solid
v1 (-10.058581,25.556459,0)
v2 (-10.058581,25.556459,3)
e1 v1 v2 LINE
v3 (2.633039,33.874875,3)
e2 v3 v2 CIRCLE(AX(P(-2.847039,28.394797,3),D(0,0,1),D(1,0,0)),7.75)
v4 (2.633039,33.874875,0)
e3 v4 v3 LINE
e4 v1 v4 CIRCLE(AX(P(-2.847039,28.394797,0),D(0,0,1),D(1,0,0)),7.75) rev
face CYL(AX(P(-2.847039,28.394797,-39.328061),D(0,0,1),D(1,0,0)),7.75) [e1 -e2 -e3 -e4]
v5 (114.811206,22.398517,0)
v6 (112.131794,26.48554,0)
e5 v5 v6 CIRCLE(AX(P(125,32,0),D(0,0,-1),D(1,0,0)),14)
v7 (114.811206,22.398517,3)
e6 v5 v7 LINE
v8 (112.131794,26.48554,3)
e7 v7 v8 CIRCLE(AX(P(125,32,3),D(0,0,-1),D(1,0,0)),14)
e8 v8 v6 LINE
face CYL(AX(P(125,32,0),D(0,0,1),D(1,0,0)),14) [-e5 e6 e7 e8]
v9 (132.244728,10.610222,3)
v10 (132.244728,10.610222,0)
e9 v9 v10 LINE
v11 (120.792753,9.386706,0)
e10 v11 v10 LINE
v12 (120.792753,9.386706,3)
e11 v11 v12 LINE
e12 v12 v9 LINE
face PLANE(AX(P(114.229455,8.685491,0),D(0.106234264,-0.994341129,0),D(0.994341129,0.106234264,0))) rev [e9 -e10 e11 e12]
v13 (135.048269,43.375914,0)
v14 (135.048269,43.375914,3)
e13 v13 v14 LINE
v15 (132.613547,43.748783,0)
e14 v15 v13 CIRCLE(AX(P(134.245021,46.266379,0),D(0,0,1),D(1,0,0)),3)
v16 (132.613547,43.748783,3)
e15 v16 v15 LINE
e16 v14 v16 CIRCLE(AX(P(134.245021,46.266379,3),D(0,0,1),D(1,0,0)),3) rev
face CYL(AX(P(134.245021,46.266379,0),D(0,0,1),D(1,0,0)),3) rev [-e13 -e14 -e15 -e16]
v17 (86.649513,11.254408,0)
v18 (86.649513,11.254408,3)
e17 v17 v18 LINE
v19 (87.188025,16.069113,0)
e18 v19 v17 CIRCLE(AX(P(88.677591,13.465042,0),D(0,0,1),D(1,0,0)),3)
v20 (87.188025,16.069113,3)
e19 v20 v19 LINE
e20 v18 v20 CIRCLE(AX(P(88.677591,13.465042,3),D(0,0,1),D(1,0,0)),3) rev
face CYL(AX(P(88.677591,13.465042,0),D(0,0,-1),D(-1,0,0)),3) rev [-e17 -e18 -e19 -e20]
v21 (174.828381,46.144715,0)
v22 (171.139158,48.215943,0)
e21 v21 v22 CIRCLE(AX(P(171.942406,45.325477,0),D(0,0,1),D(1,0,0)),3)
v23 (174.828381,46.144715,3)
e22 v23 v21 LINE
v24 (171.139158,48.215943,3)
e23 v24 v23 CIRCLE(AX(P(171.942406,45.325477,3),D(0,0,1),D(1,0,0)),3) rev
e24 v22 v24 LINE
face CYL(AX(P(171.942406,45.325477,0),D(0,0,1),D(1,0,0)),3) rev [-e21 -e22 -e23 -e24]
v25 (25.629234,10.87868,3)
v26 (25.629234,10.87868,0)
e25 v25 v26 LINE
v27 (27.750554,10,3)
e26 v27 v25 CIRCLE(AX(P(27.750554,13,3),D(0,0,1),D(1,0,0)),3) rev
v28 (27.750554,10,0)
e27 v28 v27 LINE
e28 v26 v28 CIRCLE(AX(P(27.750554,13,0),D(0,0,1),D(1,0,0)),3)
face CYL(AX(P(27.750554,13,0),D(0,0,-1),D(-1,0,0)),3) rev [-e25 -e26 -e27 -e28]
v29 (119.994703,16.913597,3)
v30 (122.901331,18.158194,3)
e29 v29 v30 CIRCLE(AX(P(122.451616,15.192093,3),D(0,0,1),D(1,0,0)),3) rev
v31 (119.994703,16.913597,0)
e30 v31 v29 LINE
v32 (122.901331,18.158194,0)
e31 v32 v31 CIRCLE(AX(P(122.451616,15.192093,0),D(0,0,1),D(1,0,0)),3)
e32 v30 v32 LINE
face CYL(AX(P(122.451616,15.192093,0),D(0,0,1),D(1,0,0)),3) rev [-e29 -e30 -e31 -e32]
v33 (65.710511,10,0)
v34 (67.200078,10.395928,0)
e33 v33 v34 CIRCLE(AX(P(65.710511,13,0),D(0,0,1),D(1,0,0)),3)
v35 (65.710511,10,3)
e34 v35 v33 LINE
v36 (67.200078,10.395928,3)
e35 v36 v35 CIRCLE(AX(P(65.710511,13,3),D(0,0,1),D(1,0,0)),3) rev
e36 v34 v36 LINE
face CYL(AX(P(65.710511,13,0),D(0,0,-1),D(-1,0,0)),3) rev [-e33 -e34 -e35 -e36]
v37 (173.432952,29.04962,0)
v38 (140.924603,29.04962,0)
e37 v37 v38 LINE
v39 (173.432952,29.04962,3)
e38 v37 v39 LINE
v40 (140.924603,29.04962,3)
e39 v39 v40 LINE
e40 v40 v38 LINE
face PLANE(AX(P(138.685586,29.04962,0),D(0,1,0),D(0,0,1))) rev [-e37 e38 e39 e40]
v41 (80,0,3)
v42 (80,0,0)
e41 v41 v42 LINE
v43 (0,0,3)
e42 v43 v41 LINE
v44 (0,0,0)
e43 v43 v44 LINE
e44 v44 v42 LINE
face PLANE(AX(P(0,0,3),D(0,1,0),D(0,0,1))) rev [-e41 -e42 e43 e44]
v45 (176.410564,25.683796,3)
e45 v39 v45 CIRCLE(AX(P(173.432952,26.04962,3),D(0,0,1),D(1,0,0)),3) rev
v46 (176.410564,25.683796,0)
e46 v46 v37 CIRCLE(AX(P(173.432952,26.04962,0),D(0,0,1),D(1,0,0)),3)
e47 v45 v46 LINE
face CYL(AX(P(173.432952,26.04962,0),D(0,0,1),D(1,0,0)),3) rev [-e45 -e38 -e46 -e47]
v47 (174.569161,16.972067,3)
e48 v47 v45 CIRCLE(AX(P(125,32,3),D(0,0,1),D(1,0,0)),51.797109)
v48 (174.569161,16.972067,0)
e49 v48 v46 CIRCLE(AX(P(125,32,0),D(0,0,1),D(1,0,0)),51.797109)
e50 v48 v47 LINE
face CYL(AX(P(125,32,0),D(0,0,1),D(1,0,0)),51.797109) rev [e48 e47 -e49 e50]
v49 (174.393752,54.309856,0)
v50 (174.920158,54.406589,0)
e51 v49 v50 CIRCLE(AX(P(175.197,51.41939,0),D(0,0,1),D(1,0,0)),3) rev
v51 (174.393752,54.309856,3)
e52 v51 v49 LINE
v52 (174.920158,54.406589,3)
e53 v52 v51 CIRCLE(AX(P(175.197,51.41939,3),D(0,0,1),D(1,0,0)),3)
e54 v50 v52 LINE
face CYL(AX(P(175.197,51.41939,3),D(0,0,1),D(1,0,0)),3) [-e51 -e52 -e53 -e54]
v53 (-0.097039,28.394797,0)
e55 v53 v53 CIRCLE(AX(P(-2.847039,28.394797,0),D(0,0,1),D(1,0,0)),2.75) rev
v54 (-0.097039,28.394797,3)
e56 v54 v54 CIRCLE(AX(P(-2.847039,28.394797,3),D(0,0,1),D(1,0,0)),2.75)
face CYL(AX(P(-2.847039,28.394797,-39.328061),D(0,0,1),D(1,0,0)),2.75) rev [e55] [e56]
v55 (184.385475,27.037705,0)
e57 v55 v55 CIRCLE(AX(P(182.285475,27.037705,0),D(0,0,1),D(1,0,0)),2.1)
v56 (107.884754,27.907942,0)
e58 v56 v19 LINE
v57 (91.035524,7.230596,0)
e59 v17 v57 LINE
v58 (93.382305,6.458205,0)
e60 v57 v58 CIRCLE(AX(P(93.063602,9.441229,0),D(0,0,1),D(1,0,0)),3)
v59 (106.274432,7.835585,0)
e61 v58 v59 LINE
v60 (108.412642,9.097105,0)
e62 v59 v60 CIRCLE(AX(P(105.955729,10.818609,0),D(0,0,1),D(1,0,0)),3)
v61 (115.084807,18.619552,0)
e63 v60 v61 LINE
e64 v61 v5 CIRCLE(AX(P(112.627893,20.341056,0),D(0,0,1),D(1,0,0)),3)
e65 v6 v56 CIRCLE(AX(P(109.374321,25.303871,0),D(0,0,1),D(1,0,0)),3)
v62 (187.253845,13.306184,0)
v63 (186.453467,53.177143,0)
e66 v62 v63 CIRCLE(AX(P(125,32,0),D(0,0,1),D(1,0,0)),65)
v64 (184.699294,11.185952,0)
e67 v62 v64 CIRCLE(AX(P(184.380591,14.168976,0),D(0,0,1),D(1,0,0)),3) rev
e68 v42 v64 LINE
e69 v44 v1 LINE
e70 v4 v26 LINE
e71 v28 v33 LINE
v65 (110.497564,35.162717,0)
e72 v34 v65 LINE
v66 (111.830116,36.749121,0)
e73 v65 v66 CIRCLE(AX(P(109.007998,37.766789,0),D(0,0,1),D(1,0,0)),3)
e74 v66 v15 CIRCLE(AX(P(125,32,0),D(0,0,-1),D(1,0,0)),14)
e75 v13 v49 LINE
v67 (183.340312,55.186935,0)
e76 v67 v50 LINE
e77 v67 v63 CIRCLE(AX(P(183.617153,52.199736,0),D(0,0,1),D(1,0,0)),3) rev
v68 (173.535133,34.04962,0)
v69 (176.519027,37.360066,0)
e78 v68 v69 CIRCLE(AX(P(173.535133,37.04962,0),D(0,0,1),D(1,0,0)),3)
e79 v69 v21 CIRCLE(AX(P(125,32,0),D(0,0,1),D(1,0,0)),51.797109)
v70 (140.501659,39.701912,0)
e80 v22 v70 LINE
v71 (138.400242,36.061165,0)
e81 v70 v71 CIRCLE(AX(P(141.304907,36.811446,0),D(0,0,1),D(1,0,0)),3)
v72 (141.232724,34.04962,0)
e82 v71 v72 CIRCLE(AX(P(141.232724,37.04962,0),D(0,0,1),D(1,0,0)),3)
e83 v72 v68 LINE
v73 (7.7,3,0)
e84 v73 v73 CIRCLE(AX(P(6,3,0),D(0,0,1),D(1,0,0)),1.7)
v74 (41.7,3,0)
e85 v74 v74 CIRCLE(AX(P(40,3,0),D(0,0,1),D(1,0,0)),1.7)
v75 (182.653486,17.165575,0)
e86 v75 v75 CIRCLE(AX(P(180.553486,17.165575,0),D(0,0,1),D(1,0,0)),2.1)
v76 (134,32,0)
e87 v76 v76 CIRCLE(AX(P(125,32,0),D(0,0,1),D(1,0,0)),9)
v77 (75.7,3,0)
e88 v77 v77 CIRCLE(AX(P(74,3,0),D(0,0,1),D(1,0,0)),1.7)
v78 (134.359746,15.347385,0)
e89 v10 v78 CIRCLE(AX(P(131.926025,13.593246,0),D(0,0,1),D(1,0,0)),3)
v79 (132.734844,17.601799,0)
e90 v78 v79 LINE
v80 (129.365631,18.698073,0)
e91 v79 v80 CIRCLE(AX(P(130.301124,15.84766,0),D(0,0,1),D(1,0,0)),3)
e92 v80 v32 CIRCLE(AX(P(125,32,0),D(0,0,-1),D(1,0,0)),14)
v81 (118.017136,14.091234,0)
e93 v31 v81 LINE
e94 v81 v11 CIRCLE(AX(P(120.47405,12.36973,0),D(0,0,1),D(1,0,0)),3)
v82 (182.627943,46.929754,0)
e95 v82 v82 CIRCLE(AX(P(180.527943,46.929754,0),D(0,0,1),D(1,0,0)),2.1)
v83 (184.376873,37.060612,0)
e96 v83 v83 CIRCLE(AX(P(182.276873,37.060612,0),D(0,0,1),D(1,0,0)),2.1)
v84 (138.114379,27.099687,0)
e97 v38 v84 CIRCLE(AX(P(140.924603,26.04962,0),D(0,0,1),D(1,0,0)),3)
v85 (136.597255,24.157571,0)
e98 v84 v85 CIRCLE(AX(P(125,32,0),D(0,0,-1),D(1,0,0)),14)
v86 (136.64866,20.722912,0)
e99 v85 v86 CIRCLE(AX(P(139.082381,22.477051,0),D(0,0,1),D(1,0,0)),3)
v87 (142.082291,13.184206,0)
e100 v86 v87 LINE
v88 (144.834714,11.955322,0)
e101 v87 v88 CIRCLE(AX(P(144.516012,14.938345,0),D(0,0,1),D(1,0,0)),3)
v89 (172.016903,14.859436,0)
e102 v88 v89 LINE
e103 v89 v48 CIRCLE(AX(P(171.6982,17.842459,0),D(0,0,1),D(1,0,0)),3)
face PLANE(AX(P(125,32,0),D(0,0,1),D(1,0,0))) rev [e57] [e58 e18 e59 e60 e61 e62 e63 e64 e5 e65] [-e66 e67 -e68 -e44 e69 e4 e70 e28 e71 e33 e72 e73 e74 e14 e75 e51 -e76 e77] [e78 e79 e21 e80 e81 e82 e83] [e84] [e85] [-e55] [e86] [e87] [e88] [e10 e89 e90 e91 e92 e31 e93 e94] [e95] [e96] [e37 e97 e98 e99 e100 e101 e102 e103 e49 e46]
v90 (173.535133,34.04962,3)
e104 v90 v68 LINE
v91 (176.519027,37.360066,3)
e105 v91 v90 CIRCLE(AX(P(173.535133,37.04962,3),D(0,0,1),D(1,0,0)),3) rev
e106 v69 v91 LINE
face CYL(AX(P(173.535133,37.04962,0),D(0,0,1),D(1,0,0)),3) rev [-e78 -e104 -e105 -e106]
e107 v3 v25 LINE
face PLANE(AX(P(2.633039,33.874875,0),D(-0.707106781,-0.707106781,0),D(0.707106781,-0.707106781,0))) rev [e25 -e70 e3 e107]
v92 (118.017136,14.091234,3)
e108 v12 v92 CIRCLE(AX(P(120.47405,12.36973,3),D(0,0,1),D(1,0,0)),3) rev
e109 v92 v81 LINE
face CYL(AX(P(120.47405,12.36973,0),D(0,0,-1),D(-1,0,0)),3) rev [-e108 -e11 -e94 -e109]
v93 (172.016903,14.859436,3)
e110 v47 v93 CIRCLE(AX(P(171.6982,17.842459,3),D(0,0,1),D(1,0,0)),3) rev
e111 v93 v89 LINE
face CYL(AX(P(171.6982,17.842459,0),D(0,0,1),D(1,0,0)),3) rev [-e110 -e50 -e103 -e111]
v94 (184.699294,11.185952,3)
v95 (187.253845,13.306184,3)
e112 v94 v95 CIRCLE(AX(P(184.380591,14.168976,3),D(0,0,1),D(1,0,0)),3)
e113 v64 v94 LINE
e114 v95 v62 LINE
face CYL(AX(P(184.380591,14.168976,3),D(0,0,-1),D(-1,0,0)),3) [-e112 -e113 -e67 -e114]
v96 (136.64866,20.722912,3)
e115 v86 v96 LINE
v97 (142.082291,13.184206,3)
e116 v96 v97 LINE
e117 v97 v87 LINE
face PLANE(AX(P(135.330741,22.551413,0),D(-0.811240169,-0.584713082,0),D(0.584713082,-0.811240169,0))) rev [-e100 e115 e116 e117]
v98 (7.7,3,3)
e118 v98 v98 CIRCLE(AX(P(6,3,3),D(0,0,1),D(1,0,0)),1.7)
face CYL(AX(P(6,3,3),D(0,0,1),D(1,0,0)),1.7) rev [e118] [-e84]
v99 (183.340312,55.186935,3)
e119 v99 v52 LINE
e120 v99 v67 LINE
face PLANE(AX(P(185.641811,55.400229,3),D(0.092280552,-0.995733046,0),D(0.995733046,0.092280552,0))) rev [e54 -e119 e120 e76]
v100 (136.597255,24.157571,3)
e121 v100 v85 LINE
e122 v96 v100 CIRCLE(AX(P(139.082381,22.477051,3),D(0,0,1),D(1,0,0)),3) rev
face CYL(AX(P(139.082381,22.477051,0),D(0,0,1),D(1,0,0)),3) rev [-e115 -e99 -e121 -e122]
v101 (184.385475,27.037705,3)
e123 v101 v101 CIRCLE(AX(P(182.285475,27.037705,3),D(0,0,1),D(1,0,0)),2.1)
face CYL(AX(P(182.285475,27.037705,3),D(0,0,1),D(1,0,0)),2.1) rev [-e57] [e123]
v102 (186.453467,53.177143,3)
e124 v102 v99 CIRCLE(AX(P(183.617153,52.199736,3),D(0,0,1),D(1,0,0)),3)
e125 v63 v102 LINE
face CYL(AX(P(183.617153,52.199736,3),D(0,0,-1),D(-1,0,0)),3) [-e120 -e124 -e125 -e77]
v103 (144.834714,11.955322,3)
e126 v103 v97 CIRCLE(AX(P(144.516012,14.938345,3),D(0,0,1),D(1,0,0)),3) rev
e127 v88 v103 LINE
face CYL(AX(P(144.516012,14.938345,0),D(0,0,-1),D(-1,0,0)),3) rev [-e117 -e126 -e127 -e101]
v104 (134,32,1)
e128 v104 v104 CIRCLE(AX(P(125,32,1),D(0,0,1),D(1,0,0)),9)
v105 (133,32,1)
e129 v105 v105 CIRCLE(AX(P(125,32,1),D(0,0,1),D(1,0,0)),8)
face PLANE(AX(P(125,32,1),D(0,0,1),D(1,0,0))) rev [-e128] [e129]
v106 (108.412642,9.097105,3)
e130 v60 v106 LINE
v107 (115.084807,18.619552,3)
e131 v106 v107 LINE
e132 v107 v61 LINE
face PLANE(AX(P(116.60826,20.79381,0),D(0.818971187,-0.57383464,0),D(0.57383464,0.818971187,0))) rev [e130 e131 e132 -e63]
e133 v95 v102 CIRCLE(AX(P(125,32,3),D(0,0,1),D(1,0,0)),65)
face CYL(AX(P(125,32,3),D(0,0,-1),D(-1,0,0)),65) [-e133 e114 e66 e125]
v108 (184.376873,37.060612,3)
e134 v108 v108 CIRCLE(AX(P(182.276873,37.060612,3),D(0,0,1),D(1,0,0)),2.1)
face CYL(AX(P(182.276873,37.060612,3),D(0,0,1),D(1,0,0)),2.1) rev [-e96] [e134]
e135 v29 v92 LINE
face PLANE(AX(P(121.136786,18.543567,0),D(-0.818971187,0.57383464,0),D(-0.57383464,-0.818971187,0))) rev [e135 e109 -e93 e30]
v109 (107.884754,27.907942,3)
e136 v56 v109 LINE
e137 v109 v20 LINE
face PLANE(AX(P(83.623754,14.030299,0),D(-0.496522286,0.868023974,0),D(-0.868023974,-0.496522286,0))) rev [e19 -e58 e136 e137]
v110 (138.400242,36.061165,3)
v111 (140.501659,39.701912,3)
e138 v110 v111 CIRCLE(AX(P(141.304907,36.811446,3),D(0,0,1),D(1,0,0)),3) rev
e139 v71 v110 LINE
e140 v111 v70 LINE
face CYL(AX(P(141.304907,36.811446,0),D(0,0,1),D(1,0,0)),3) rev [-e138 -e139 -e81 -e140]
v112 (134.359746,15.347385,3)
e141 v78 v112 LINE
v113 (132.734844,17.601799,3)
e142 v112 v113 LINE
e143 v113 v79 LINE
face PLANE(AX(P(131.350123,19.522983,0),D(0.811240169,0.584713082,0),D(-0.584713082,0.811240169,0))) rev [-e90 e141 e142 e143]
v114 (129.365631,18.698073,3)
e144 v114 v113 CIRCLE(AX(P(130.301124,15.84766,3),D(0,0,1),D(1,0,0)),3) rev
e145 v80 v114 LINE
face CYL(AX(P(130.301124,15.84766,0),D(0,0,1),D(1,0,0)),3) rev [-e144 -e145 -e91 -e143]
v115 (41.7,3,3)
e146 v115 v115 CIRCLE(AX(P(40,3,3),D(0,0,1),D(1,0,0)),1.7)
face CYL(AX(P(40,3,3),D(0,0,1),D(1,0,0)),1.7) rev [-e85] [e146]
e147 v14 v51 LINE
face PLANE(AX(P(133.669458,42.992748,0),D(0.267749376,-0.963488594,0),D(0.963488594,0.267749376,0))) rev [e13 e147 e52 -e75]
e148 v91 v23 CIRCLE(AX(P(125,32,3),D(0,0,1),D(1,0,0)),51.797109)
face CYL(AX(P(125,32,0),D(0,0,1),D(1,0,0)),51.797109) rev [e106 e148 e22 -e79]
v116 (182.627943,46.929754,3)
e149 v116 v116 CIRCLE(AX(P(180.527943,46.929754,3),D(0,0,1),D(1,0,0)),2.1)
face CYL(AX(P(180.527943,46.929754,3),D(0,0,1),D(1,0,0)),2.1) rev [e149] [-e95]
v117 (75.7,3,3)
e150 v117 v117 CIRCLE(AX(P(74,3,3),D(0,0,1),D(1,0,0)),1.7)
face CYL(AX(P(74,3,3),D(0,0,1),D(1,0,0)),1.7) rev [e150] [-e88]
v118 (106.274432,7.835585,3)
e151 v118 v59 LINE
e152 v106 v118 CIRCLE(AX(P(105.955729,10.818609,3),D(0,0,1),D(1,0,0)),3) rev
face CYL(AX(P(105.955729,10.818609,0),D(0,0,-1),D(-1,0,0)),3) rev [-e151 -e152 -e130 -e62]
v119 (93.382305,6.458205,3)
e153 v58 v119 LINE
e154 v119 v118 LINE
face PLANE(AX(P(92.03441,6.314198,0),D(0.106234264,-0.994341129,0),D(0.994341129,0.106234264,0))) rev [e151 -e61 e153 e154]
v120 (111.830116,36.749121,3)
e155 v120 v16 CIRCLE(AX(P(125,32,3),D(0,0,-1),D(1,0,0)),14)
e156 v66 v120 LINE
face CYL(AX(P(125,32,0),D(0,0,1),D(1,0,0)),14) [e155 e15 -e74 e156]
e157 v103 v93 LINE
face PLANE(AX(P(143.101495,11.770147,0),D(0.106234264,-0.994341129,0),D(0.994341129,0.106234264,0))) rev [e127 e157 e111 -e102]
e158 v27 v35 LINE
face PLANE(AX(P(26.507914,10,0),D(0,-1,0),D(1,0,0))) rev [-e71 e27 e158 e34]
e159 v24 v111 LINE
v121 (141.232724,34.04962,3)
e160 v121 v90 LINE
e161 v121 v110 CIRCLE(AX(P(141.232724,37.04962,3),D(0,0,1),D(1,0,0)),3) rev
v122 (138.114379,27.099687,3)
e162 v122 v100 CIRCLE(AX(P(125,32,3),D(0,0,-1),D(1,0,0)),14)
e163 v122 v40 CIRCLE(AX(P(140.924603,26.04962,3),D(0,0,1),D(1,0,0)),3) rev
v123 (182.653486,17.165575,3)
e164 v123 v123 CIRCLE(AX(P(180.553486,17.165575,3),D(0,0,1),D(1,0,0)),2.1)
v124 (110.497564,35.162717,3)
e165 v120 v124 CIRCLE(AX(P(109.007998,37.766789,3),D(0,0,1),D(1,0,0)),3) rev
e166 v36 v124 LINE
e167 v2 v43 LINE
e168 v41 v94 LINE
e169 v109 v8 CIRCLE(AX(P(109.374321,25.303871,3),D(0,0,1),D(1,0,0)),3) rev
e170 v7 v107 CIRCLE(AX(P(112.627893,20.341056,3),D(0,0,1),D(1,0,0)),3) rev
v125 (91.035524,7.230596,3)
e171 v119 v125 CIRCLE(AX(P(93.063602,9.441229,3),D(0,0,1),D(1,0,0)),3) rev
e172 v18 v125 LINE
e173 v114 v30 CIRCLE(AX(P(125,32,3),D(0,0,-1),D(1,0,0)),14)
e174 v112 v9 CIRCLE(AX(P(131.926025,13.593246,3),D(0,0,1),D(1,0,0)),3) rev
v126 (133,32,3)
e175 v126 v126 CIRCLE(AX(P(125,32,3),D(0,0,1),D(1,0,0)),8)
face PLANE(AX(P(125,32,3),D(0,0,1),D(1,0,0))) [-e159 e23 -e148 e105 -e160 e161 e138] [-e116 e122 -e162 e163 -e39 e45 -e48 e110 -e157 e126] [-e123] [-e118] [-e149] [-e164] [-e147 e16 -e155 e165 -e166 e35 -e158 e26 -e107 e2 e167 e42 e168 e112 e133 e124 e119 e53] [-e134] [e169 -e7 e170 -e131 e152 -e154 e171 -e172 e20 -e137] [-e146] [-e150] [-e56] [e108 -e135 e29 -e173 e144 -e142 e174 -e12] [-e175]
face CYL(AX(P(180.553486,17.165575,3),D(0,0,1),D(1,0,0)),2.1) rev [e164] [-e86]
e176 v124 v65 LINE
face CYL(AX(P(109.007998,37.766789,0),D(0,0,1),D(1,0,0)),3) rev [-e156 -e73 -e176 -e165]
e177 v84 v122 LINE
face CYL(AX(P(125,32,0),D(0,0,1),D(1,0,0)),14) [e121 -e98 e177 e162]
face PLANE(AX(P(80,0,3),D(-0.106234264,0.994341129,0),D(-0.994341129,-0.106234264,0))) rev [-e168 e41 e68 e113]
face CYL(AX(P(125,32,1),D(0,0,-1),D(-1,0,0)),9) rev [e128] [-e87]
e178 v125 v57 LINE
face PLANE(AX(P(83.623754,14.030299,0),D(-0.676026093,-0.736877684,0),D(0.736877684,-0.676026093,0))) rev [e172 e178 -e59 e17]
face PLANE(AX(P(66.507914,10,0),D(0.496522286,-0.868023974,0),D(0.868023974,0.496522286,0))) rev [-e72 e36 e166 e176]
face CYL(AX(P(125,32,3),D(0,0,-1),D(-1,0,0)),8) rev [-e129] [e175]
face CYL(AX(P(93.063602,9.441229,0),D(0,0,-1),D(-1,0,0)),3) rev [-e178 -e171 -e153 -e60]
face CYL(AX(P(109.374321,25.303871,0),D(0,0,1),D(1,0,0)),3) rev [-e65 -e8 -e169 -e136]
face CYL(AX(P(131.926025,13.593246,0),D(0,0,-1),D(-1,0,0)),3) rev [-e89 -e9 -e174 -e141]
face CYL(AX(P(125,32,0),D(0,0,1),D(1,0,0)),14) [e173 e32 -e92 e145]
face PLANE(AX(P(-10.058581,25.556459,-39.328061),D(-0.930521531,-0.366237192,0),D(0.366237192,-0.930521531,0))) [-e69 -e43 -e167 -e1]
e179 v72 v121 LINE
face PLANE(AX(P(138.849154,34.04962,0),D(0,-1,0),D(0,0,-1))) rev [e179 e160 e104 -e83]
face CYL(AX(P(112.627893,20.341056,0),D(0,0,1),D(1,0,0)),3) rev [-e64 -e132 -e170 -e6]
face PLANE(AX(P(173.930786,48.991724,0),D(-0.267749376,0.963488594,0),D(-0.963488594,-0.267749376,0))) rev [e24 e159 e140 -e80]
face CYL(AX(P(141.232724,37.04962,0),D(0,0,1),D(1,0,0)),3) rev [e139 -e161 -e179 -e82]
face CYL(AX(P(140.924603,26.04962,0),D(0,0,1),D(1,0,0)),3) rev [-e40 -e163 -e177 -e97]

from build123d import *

# Parameters (mm, degrees)
SKETCH_1_R          = 8.000000000000027
EXTRUDE_1_DEPTH     = 3
HOLE_WIZARD_M31_D   = 3.4
SKETCH_5_R          = 2.749999999999999
EXTRUDE_2_DEPTH     = 3
CUT_EXTRUDE_1_DEPTH = 198.9348007797117
M5X0_81_D           = 4.2
CUT_EXTRUDE_2_DEPTH = 198.9348007797117
CUT_EXTRUDE_3_DEPTH = 198.9348007797117
FILLET_1_R          = 3
SKETCH_12_R         = 8.999999999999996
CUT_EXTRUDE_4_DEPTH = 1


with BuildPart() as part:
    # Эскиз1 → Бобышка-Вытянуть1 (new body)
    with BuildSketch(Plane.XY):
        with BuildLine():
            Line((0, 0), (80, 0))
            Line((80, 0), (186.64735263363326, 11.394080625595256))
            ThreePointArc((186.64735263363326, 11.394080625595256), (189.98303763522418, 33.48486352875775), (185.64181138843185, 55.40022887772366))
            Line((185.64181138843185, 55.40022887772366), (29.81788185582472, 40.959090919498855))
            Line((29.81788185582472, 40.959090919498855), (1.6e-16, 40.959090919498855))
            Line((1.6e-16, 40.959090919498855), (0, 0))
        make_face()
        with Locations((124.99999999999999, 31.999999999999986)):
            Circle(SKETCH_1_R, mode=Mode.SUBTRACT)
    extrude(amount=EXTRUDE_1_DEPTH)

    # Отверстие с зазором M31 (through all)
    with Locations(Plane.XY.offset(3)):
        with Locations((6, 3), (40, 3), (74, 3)):
            Hole(HOLE_WIZARD_M31_D / 2)

    # Эскиз5 → Бобышка-Вытянуть2 (add)
    with BuildSketch(Plane.XY.offset(3)):
        with BuildLine():
            Line((-10.05858051013897, 25.55645888767347), (0, 0))
            Line((0, 0), (0, 21.18668565496398))
            ThreePointArc((0, 21.18668565496398), (0.24099496955508215, 35.503000018294074), (-10.05858051013897, 25.55645888767347))
        make_face()
        with Locations((-2.8470386460772503, 28.39479712384004)):
            Circle(SKETCH_5_R, mode=Mode.SUBTRACT)
    extrude(amount=-EXTRUDE_2_DEPTH)

    # Эскиз6 → Вырез-Вытянуть1 (cut, through all)
    with BuildSketch(Plane.XY.offset(3)):
        with BuildLine():
            Line((2.6330389081184924, 33.874874678035766), (26.507913586154185, 10.000000000000002))
            Line((26.507913586154185, 10.000000000000002), (66.50791358615419, 10))
            Line((66.50791358615419, 10), (104.37682925914895, 47.8689156729949))
            Line((104.37682925914895, 47.8689156729949), (29.817881855824798, 40.95909091949886))
            Line((29.817881855824798, 40.95909091949886), (1.6e-16, 40.959090919498855))
            Line((1.6e-16, 40.959090919498855), (0, 35.60290859271609))
            ThreePointArc((0, 35.60290859271609), (1.4052244403019993, 34.874053149358424), (2.6330389081184924, 33.874874678035766))
        make_face()
    extrude(amount=-CUT_EXTRUDE_1_DEPTH, mode=Mode.SUBTRACT)

    # Отверстие обработанное метчиком M5x0.81 (through all)
    with Locations(Plane.XY.offset(3)):
        with Locations((180.527942872, 46.929754199), (182.276873258, 37.060611597), (182.285474835, 27.037704871), (180.553486246, 17.165574973)):
            Hole(M5X0_81_D / 2)

    # Эскиз10 → Вырез-Вытянуть2 (cut, through all)
    with BuildSketch(Plane.XY.offset(3)):
        with BuildLine():
            Line((66.50791358615419, 10), (111.50918528954904, 35.741379217384946))
            ThreePointArc((111.50918528954904, 35.741379217384946), (120.64604118056285, 45.30575223723353), (133.66945767503876, 42.9927477739058))
            Line((133.66945767503876, 42.9927477739058), (174.65262323365093, 54.38179491403086))
            Line((174.65262323365093, 54.38179491403086), (104.37682925914895, 47.8689156729949))
            Line((104.37682925914895, 47.8689156729949), (66.50791358615419, 10))
        make_face()
    extrude(amount=-CUT_EXTRUDE_2_DEPTH, mode=Mode.SUBTRACT)

    # Эскиз11 → Вырез-Вытянуть3 (cut, through all)
    with BuildSketch(Plane.XY.offset(3)):
        with BuildLine():
            Line((92.03441017428995, 6.314197935775633), (107.63021765734568, 7.980436088856215))
            Line((107.63021765734568, 7.980436088856215), (116.60825973560767, 20.79380995453953))
            ThreePointArc((116.60825973560767, 20.79380995453953), (113.01565006615179, 24.762917945534056), (111.17548635848748, 29.790289028937345))
            Line((111.17548635848748, 29.790289028937345), (83.6237542782258, 14.03029921690936))
            Line((83.6237542782258, 14.03029921690936), (92.03441017428995, 6.314197935775633))
        make_face()
        with BuildLine():
            Line((173.93078584223207, 48.99172434981097), (137.24012127463044, 38.79554495109394))
            ThreePointArc((137.24012127463044, 38.79554495109394), (138.25871477406997, 36.49516212609262), (138.84915367150305, 34.04962010701802))
            Line((138.84915367150305, 34.04962010701802), (176.75654119949715, 34.04962010701802))
            ThreePointArc((176.75654119949715, 34.04962010701802), (175.8950005059697, 41.62493755905363), (173.93078584223207, 48.99172434981097))
        make_face()
        with BuildLine():
            Line((121.13678636305278, 18.543567322826398), (114.22945460790407, 8.685490982627265))
            Line((114.22945460790407, 8.685490982627265), (137.37877384972535, 11.158737653597806))
            Line((137.37877384972535, 11.158737653597806), (131.35012272889716, 19.52298347648991))
            ThreePointArc((131.35012272889716, 19.52298347648991), (126.33641056880738, 18.063931444213534), (121.13678636305278, 18.543567322826398))
        make_face()
        with BuildLine():
            Line((143.10149490164468, 11.770146595809063), (173.95081110549165, 15.066052095485405))
            ThreePointArc((173.95081110549165, 15.066052095485405), (175.8152185482702, 21.96236763923512), (176.7130134299426, 29.049620107018022))
            Line((176.7130134299426, 29.049620107018022), (138.68558579261725, 29.049620107018022))
            ThreePointArc((138.68558579261725, 29.049620107018022), (137.43996226457978, 25.57759088380138), (135.33074101249935, 22.551413326181333))
            Line((135.33074101249935, 22.551413326181333), (143.10149490164468, 11.770146595809063))
        make_face()
    extrude(amount=-CUT_EXTRUDE_3_DEPTH, mode=Mode.SUBTRACT)

    # Скругление1
    # the kernel refuses this fillet: 3 mm, written as the material it adds along each edge
    with BuildSketch(Plane(origin=(133.66945767503876, 42.992747773905805, 3), x_dir=(-0.8130725400087585, 0.5821623868678788, 0), z_dir=(0, 0, -1))) as fillet_1_piece_1:
        with BuildLine():
            CenterArc((1.4378103136794376, 2.996771470104822), FILLET_1_R, 218.86683700391524, 48.47477501487009)
            Line((-0.8980091423480934, 1.1142339621535844), (0, 0))
            ThreePointArc((0, 0), (0.6493336900487631, 0.01506647284415901), (1.2986673800975244, 0))
        make_face()
    extrude(amount=3)
    with BuildSketch(Plane(origin=(111.50918528954904, 35.741379217384946, 3), x_dir=(-0.8680239741683529, -0.49652228577273216, 0), z_dir=(0, 0, -1))) as fillet_1_piece_2:
        with BuildLine():
            CenterArc((1.16542958022559, 2.9999999999999964), FILLET_1_R, 229.5997180782211, 40.4002819217792)
            ThreePointArc((-0.7789413643040896, 0.7153946445679564), (-0.382712836911811, 0.3650554500406897), (0, 0))
            Line((0, 0), (1.165429580225606, 1e-17))
        make_face()
    extrude(amount=3)
    with BuildSketch(Plane(origin=(92.03441017428995, 6.314197935775633, 3), x_dir=(0.9943411291859616, 0.10623426381910231, 0), z_dir=(0, 0, -1))) as fillet_1_piece_3:
        with BuildLine():
            CenterArc((FILLET_1_R * 0.451855277113, -FILLET_1_R), FILLET_1_R, 89.9999999999999, 48.632165419305906)
            Line((-FILLET_1_R * 0.298626929798, -FILLET_1_R * 0.339109345572), (0, 0))
            Line((0, 0), (FILLET_1_R * 0.451855277113, -1e-17))
        make_face()
    extrude(amount=3)
    with BuildSketch(Plane(origin=(83.6237542782258, 14.03029921690936, 3), x_dir=(0.8680239741683552, 0.496522285772728, 0), z_dir=(0, 0, -1))) as fillet_1_piece_4:
        with BuildLine():
            CenterArc((FILLET_1_R * 1.36872958736, FILLET_1_R), FILLET_1_R, 162.30406475526607, 107.69593524473399)
            Line((FILLET_1_R * 0.416046539376, FILLET_1_R * 1.30396547515), (0, 0))
            Line((0, 0), (FILLET_1_R * 1.36872958736, -5e-17))
        make_face()
    extrude(amount=3)
    with BuildSketch(Plane(origin=(111.17548635848748, 29.790289028937345, 3), x_dir=(0.2779694371109165, -0.960589918764631, 0), z_dir=(0, 0, -1))) as fillet_1_piece_5:
        with BuildLine():
            CenterArc((3.8089394275276667, 2.977268689428244), FILLET_1_R, 166.36886991345514, 96.57341947464624)
            Line((0.893440130163459, 3.684279189398942), (0, 0))
            ThreePointArc((0, 0), (1.720166193077011, 0.10607944933485743), (3.4403323861540267, -8e-17))
        make_face()
    extrude(amount=3)
    with BuildSketch(Plane(origin=(116.60825973560767, 20.79380995453953, 3), x_dir=(-0.5738346401441979, -0.8189711873873091, 0), z_dir=(0, 0, -1))) as fillet_1_piece_6:
        with BuildLine():
            CenterArc((2.6548645047083914, 3.0000000000000018), FILLET_1_R, 191.68179125859942, 78.31820874140055)
            ThreePointArc((-0.28299711772598396, 2.392571742979232), (-0.08993594197380265, 1.2023847782433434), (0, 0))
            Line((0, 0), (2.654864504708389, 0))
        make_face()
    extrude(amount=3)
    with BuildSketch(Plane(origin=(107.63021765734568, 7.980436088856215, 3), x_dir=(-0.9943411291859616, -0.10623426381910264, 0), z_dir=(0, 0, -1))) as fillet_1_piece_7:
        with BuildLine():
            CenterArc((FILLET_1_R * 0.4545006609, FILLET_1_R), FILLET_1_R, 221.11634455075327, 48.883655449246646)
            Line((-FILLET_1_R * 0.298875173788, FILLET_1_R * 0.342409814772), (0, 0))
            Line((0, 0), (FILLET_1_R * 0.4545006609, 0))
        make_face()
    extrude(amount=3)
    with BuildSketch(Plane(origin=(137.37877384972535, 11.158737653597806, 3), x_dir=(-0.9943411291859617, -0.10623426381910242, 0), z_dir=(0, 0, -1))) as fillet_1_piece_8:
        with BuildLine():
            CenterArc((FILLET_1_R * 1.72108797237, FILLET_1_R), FILLET_1_R, 150.3155592750541, 119.68444072494606)
            Line((FILLET_1_R * 0.852321942917, FILLET_1_R * 1.49522276409), (0, 0))
            Line((0, 0), (FILLET_1_R * 1.72108797237, -6e-17))
        make_face()
    extrude(amount=3)
    with BuildSketch(Plane(origin=(114.22945460790407, 8.685490982627265, 3), x_dir=(0.5738346401441975, 0.8189711873873095, 0), z_dir=(0, 0, -1))) as fillet_1_piece_9:
        with BuildLine():
            CenterArc((FILLET_1_R * 2.20021682261, FILLET_1_R), FILLET_1_R, 138.8836554492469, 131.11634455075307)
            Line((FILLET_1_R * 1.44684098792, FILLET_1_R * 1.65759018523), (0, 0))
            Line((0, 0), (FILLET_1_R * 2.20021682261, 2e-17))
        make_face()
    extrude(amount=3)
    with BuildSketch(Plane(origin=(121.13678636305278, 18.543567322826398, 3), x_dir=(-0.5738346401441984, -0.8189711873873087, 0), z_dir=(0, 0, -1))) as fillet_1_piece_10:
        with BuildLine():
            CenterArc((1.990265982493936, -3.0000000000000013), FILLET_1_R, 89.99999999999993, 63.60335445318877)
            ThreePointArc((-0.6969473887897009, -1.666251786432529), (-0.32157533753284756, -0.844376737614642), (0, 0))
            Line((0, 0), (1.9902659824939402, 5e-17))
        make_face()
    extrude(amount=3)
    with BuildSketch(Plane(origin=(131.35012272889716, 19.522983476489905, 3), x_dir=(0.5847130820131278, -0.8112401689528875, 0), z_dir=(0, 0, -1))) as fillet_1_piece_11:
        with BuildLine():
            CenterArc((2.3682065417982856, 3.0000000000000004), FILLET_1_R, 197.6131255819165, 72.3868744180835)
            ThreePointArc((-0.4911575816723561, 2.0922352675891354), (-0.20537262369653822, 1.0555561343908344), (0, 0))
            Line((0, 0), (2.368206541798286, 1e-17))
        make_face()
    extrude(amount=3)
    with BuildSketch(Plane(origin=(173.93078584223207, 48.99172434981097, 3), x_dir=(-0.9634885943550286, -0.26774937637232876, 0), z_dir=(0, 0, -1))) as fillet_1_piece_12:
        with BuildLine():
            CenterArc((2.897416461846995, -3.0000000000000013), FILLET_1_R, 90.00000000000013, 89.6828037551533)
            ThreePointArc((-0.1025375653525866, -2.9833917282944458), (-0.07276547265506263, -1.4909570345015974), (0, 0))
            Line((0, 0), (2.8974164618469884, -5e-17))
        make_face()
    extrude(amount=3)
    with BuildSketch(Plane(origin=(176.75654119949715, 34.04962010701802, 3), x_dir=(-1, 0, 0), z_dir=(0, 0, -1))) as fillet_1_piece_13:
        with BuildLine():
            CenterArc((3.221407714928148, 3), FILLET_1_R, 174.06028761643057, 95.93971238356943)
            ThreePointArc((0.23751372052348074, 3.310445857043881), (0.09223500645424565, 1.6571257852503223), (0, 0))
            Line((0, 0), (3.221407714928148, 0))
        make_face()
    extrude(amount=3)
    with BuildSketch(Plane(origin=(138.84915367150305, 34.04962010701802, 3), x_dir=(-0.22238352713061194, 0.9749592642059198, 0), z_dir=(0, 0, -1))) as fillet_1_piece_14:
        with BuildLine():
            CenterArc((2.394810958848804, 2.9910348047399777), FILLET_1_R, 192.84906769128517, 72.72030630224907)
            Line((-0.5300668337689619, 2.32388422334817), (0, 0))
            ThreePointArc((0, 0), (1.081527529802683, 0.04183757788016305), (2.163055059605388, 0))
        make_face()
    extrude(amount=3)
    with BuildSketch(Plane(origin=(137.24012127463044, 38.79554495109394, 3), x_dir=(0.9634885943550292, 0.2677493763723269, 0), z_dir=(0, 0, -1))) as fillet_1_piece_15:
        with BuildLine():
            CenterArc((3.3851332754644625, 3.0000000000000013), FILLET_1_R, 179.08948046092507, 90.91051953907493)
            ThreePointArc((0.3855120801952658, 3.047672684965048), (0.27660128884680796, 1.5132304278712665), (0, 0))
            Line((0, 0), (3.3851332754644634, 6e-17))
        make_face()
    extrude(amount=3)
    with BuildSketch(Plane(origin=(143.10149490164468, 11.770146595809063, 3), x_dir=(0.9943411291859617, 0.10623426381910227, 0), z_dir=(0, 0, -1))) as fillet_1_piece_16:
        with BuildLine():
            CenterArc((FILLET_1_R * 0.581027824292, -FILLET_1_R), FILLET_1_R, 90.00000000000017, 60.3155592750542)
            Line((-FILLET_1_R * 0.287738205159, -FILLET_1_R * 0.50477723591), (0, 0))
            Line((0, 0), (FILLET_1_R * 0.581027824292, -1e-17))
        make_face()
    extrude(amount=3)
    with BuildSketch(Plane(origin=(135.33074101249935, 22.551413326181333, 3), x_dir=(0.6191906205716086, 0.7852407117541386, 0), z_dir=(0, 0, -1))) as fillet_1_piece_17:
        with BuildLine():
            CenterArc((2.264587612579221, 2.9919845725048013), FILLET_1_R, 195.96022348085205, 69.85051867741447)
            Line((-0.6197708484362799, 2.1670747178126035), (0, 0))
            ThreePointArc((0, 0), (1.0227169863260859, 0.03740532831092148), (2.0454339726521837, 5e-17))
        make_face()
    extrude(amount=3)
    with BuildSketch(Plane(origin=(138.68558579261725, 29.049620107018022, 3), x_dir=(1, 0, 0), z_dir=(0, 0, -1))) as fillet_1_piece_18:
        with BuildLine():
            CenterArc((2.239017157823781, 3), FILLET_1_R, 200.4886819411101, 69.51131805888991)
            ThreePointArc((-0.5712068922540539, 1.9499329600620143), (-0.2501815737843174, 0.9853428458000373), (0, 0))
            Line((0, 0), (2.239017157823781, 0))
        make_face()
    extrude(amount=3)
    with BuildSketch(Plane(origin=(176.7130134299426, 29.049620107018022, 3), x_dir=(-0.08949841173945887, -0.9959869649227917, 0), z_dir=(0, 0, -1))) as fillet_1_piece_19:
        with BuildLine():
            CenterArc((3.2815211967518683, 2.998403344451645), FILLET_1_R, 174.86524824854192, 97.00415022459947)
            Line((0.29356030198349303, 3.266898579670022), (0, 0))
            ThreePointArc((0, 0), (1.6896926532610193, -0.02756738048459419), (3.37938530652206, -2e-17))
        make_face()
    extrude(amount=3)
    with BuildSketch(Plane(origin=(173.95081110549165, 15.066052095485404, 3), x_dir=(-0.994341129185962, -0.1062342638191007, 0), z_dir=(0, 0, -1))) as fillet_1_piece_20:
        with BuildLine():
            CenterArc((1.944914405279492, 2.9999999999999996), FILLET_1_R, 202.9640654934915, 67.03593450650857)
            ThreePointArc((-0.8173347828283964, 1.8295387991063596), (-0.41751534735678364, 0.9108166317013427), (0, 0))
            Line((0, 0), (1.944914405279496, -1e-17))
        make_face()
    extrude(amount=3)
    with BuildSketch(Plane(origin=(66.50791358615419, 10, 3), x_dir=(-1, 0, 0), z_dir=(0, 0, -1))) as fillet_1_piece_21:
        with BuildLine():
            CenterArc((FILLET_1_R * 0.265800810182, FILLET_1_R), FILLET_1_R, 240.229818231195, 29.770181768805003)
            Line((-FILLET_1_R * 0.230721475591, FILLET_1_R * 0.131976025832), (0, 0))
            Line((0, 0), (FILLET_1_R * 0.265800810182, 0))
        make_face()
    extrude(amount=3)
    with BuildSketch(Plane(origin=(26.507913586154185, 10.000000000000002, 3), x_dir=(-0.7071067811865482, 0.7071067811865468, 0), z_dir=(0, 0, -1))) as fillet_1_piece_22:
        with BuildLine():
            CenterArc((FILLET_1_R * 0.414213562373, FILLET_1_R), FILLET_1_R, 225.00000000000006, 45.000000000000114)
            Line((-FILLET_1_R * 0.292893218813, FILLET_1_R * 0.292893218813), (0, 0))
            Line((0, 0), (FILLET_1_R * 0.414213562373, 1e-17))
        make_face()
    extrude(amount=3)
    # the kernel refuses this fillet: 3 mm, written as the material it takes off along each edge
    with BuildSketch(Plane(origin=(185.64181138843185, 55.40022887772366, -5.916554139644239), x_dir=(0.3429596926027861, -0.9393501206950486, 0), z_dir=(0, 0, 1))) as fillet_1_2_piece_1:
        with BuildLine():
            CenterArc((2.312007309953282, -2.999502837675169), FILLET_1_R, 88.95688520370253, 76.28063656309585)
            Line((-0.5889640915743037, -2.2350651832395365), (0, 0))
            ThreePointArc((0, 0), (1.183310827928844, 0.010771850371206), (2.366621655857689, 6e-17))
        make_face()
    extrude(amount=14.833108279288478, mode=Mode.SUBTRACT)
    with BuildSketch(Plane(origin=(174.6526232336509, 54.381794914030856, 3.6717035747929345), x_dir=(-0.9634885943550205, -0.26774937637235796, 0), z_dir=(0, 0, -1))) as fillet_1_2_piece_2:
        with BuildLine():
            CenterArc((FILLET_1_R * 0.0895604766391, -FILLET_1_R), FILLET_1_R, 90.00000000000188, 10.235566175230105)
            Line((-FILLET_1_R * 0.0881351658569, -FILLET_1_R * 0.0159145064386), (0, 0))
            Line((0, 0), (FILLET_1_R * 0.0895604766391, -1e-17))
        make_face()
    extrude(amount=4.34340714958587, mode=Mode.SUBTRACT)
    with BuildSketch(Plane(origin=(186.64735263363326, 11.394080625595256, -5.014960799028406), x_dir=(-0.9943411291859617, -0.10623426381910225, 0), z_dir=(0, 0, 1))) as fillet_1_2_piece_3:
        with BuildLine():
            CenterArc((1.9591455422097777, -2.9999999999999996), FILLET_1_R, 89.99999999999983, 67.1875610802881)
            ThreePointArc((-0.806191458360402, -1.8368528582859858), (-0.41018210878156197, -0.9153162297170893), (0, 0))
            Line((0, 0), (1.9591455422097865, 2e-17))
        make_face()
    extrude(amount=13.029921598056813, mode=Mode.SUBTRACT)

    # Эскиз12 → Вырез-Вытянуть4 (cut)
    with BuildSketch(Plane.XY):
        with Locations((124.99999999999999, 31.999999999999986)):
            Circle(SKETCH_12_R)
    extrude(amount=CUT_EXTRUDE_4_DEPTH, mode=Mode.SUBTRACT)


solid = part.part
